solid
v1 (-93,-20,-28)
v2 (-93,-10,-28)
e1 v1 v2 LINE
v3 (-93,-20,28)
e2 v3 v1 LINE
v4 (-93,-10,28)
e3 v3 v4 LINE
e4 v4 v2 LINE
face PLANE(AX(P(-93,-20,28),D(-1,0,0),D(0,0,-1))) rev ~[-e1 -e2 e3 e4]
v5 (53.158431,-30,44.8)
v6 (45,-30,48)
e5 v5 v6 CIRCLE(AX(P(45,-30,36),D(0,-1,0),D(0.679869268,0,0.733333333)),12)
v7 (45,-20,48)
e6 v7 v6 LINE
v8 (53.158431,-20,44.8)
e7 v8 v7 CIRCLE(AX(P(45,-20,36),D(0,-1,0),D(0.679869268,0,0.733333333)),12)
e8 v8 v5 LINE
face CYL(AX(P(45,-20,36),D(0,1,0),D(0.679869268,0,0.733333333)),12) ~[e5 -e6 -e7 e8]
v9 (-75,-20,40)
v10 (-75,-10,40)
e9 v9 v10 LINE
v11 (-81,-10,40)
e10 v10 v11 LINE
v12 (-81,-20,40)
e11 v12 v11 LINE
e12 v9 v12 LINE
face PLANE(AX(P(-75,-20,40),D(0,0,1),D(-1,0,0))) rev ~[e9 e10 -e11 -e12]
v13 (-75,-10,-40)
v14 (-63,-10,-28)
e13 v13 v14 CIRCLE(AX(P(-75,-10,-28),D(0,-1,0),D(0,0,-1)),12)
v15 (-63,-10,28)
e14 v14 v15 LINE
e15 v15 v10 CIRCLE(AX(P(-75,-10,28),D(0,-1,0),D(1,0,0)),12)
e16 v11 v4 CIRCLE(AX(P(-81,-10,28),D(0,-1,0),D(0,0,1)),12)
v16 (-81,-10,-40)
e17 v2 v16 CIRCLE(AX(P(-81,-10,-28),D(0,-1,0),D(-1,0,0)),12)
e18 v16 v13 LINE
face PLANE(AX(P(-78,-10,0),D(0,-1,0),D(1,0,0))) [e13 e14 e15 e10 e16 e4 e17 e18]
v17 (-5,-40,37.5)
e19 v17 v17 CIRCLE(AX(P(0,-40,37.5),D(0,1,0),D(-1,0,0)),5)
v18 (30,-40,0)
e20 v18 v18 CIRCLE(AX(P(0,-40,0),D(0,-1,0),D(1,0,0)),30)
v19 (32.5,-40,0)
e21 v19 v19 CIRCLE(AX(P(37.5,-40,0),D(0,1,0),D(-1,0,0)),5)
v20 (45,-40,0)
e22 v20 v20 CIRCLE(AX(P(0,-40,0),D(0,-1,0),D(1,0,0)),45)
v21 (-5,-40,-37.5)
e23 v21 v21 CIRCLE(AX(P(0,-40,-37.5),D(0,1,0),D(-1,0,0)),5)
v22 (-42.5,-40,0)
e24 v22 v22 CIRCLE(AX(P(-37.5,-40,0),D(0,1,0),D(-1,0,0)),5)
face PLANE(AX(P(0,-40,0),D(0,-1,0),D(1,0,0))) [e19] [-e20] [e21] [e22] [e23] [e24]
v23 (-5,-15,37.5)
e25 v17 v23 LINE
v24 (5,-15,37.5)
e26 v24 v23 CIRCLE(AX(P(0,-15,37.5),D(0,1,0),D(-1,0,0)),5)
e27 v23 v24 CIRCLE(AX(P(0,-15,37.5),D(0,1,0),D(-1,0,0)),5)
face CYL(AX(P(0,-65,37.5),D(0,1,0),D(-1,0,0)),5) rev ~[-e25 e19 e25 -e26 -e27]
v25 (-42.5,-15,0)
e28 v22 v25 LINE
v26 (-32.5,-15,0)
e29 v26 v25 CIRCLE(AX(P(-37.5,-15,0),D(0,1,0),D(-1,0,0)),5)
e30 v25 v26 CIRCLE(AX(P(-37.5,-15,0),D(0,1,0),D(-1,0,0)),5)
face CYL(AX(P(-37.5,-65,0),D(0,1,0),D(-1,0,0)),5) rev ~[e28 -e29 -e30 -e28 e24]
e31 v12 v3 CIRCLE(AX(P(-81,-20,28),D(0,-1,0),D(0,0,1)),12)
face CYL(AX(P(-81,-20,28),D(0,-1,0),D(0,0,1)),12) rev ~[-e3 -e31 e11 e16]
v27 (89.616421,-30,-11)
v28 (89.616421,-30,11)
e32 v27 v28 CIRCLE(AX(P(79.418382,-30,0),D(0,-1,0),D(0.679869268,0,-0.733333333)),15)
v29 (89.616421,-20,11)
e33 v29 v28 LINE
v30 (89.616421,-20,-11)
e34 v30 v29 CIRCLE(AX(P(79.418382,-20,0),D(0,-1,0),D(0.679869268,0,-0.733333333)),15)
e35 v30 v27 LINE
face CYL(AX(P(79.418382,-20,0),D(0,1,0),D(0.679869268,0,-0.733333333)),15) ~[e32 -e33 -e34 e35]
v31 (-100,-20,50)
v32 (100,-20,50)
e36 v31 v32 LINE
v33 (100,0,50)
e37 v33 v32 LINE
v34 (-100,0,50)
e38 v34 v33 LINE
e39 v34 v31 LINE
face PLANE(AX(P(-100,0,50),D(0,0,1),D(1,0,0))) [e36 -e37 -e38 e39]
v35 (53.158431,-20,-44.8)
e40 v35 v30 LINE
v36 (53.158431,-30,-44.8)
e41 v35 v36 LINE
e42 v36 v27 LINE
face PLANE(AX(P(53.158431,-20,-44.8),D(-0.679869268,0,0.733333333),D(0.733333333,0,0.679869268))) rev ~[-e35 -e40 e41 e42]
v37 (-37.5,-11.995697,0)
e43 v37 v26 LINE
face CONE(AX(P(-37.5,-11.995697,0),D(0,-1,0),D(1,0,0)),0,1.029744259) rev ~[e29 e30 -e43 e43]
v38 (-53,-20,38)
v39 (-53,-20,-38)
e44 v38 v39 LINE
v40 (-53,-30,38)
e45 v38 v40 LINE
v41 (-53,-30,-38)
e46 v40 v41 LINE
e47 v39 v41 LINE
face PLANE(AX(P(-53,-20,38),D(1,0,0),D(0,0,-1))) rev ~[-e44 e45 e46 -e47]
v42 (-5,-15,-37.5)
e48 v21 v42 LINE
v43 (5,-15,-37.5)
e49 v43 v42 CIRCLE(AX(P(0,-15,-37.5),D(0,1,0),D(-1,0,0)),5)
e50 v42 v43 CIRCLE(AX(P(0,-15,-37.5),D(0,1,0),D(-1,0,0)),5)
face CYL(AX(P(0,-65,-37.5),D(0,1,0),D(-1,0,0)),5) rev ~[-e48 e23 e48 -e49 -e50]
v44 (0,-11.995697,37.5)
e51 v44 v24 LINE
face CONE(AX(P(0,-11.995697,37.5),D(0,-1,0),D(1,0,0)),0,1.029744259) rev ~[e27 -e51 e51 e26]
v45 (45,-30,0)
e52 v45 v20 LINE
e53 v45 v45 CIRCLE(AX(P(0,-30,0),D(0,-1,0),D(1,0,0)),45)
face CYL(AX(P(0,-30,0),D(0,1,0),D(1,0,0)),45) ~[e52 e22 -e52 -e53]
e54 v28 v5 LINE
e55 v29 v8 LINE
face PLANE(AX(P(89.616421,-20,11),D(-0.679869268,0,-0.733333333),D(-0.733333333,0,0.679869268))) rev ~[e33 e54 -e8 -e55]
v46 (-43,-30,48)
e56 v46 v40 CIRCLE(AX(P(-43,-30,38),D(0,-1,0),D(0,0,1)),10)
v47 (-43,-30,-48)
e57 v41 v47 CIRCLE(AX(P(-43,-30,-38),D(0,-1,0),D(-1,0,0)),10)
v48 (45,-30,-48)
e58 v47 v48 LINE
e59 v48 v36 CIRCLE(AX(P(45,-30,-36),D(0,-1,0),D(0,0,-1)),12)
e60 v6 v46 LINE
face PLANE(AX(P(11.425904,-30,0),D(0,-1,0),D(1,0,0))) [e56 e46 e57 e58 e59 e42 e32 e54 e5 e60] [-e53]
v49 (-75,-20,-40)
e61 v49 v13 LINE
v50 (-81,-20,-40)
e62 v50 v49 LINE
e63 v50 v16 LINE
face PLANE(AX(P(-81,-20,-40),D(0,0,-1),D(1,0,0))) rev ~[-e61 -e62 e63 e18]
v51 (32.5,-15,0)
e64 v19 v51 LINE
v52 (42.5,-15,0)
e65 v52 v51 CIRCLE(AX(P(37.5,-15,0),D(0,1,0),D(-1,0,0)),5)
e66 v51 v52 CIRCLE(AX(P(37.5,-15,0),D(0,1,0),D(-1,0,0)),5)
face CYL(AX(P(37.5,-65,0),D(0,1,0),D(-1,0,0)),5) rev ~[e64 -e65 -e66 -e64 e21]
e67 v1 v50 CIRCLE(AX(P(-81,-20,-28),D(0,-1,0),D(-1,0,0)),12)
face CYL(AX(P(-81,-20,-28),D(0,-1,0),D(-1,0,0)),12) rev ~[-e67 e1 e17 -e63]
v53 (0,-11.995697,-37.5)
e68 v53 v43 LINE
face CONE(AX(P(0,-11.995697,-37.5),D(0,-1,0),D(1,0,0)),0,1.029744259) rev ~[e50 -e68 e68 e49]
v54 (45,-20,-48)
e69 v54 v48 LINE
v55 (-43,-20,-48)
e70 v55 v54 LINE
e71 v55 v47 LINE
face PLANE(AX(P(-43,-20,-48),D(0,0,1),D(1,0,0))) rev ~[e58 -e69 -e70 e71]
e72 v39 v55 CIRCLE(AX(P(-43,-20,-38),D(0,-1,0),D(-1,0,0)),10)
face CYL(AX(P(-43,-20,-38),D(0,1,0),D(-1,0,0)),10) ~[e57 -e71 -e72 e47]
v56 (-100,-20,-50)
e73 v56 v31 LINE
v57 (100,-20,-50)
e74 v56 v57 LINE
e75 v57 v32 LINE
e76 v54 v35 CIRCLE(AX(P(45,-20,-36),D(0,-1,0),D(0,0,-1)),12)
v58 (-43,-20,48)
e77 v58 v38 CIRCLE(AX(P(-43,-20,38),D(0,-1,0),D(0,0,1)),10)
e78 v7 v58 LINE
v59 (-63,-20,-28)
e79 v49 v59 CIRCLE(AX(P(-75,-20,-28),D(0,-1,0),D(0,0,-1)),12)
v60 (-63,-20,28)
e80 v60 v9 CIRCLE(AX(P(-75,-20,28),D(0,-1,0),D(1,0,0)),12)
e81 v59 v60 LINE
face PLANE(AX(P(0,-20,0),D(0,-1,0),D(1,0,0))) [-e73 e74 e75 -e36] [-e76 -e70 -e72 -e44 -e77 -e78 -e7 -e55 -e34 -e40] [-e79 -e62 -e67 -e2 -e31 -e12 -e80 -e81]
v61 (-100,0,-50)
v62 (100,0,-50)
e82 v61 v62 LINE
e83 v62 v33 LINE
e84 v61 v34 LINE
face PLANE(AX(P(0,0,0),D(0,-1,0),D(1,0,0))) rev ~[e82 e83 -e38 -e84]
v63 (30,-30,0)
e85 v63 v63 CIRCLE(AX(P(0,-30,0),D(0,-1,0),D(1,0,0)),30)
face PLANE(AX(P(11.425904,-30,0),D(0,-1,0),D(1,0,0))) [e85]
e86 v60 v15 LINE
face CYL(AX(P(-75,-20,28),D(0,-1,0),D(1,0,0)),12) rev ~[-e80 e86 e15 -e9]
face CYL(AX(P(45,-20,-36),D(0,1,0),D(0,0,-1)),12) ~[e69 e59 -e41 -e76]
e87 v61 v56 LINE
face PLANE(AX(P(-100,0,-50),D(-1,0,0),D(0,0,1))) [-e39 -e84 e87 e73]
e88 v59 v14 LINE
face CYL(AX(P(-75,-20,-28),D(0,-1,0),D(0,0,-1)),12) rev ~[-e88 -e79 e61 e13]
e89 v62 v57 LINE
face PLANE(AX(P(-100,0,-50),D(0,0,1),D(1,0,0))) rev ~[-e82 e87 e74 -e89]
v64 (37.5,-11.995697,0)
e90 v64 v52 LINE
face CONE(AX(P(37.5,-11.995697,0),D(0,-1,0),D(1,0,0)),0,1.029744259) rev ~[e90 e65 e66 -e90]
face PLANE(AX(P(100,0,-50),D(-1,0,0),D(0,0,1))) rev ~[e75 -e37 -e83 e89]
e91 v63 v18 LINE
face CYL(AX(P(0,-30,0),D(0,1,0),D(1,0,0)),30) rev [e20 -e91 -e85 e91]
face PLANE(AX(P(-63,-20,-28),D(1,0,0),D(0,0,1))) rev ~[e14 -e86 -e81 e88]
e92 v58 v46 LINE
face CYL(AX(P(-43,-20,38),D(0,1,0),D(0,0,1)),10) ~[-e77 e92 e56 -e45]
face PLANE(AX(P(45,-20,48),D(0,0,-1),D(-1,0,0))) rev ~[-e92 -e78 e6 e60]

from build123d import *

# Parameters (mm, degrees)
F0_W     = 200
F0_H     = 100
F1_DEPTH = 20
F3_DEPTH = 10
F5_DEPTH = 10
F6_R     = 45
F6_R_2   = 30
F7_DEPTH = 10
F9_D     = 10
F9_DEPTH = 25
F9_TIP   = 3.0043030951


with BuildPart() as f1:
    # F0 (on Front) → F1 (new body)
    with BuildSketch(Plane.XZ):
        Rectangle(F0_W, F0_H)
    extrude(amount=F1_DEPTH)

    # F2 (on face) → F3 (cut)
    with BuildSketch(Plane.XZ.offset(20)):
        with BuildLine():
            Line((-81, -40), (-75, -40))
            ThreePointArc((-75, -40), (-66.5147186258, -36.4852813742), (-63, -28))
            Line((-63, -28), (-63, 28))
            ThreePointArc((-63, 28), (-66.5147186258, 36.4852813742), (-75, 40))
            Line((-75, 40), (-81, 40))
            ThreePointArc((-81, 40), (-89.4852813742, 36.4852813742), (-93, 28))
            Line((-93, 28), (-93, -28))
            ThreePointArc((-93, -28), (-89.4852813742, -36.4852813742), (-81, -40))
        make_face()
    extrude(amount=-F3_DEPTH, mode=Mode.SUBTRACT)

    # F4 (on face) → F5 (join)
    with BuildSketch(Plane.XZ.offset(20)):
        with BuildLine():
            ThreePointArc((-43, 48), (-50.0710678119, 45.0710678119), (-53, 38))
            Line((-53, 38), (-53, -38))
            ThreePointArc((-53, -38), (-50.0710678119, -45.0710678119), (-43, -48))
            Line((-43, -48), (45, -48))
            ThreePointArc((45, -48), (49.38178046, -47.171392035), (53.1584312217, -44.8))
            Line((53.1584312217, -44.8), (89.6164207439, -11))
            ThreePointArc((89.6164207439, -11), (94.4183817168, 0), (89.6164207439, 11))
            Line((89.6164207439, 11), (53.1584312217, 44.8))
            ThreePointArc((53.1584312217, 44.8), (49.38178046, 47.171392035), (45, 48))
            Line((45, 48), (-43, 48))
        make_face()
    extrude(amount=F5_DEPTH)

    # F6 (on face) → F7 (join)
    with BuildSketch(Plane.XZ.offset(30)):
        Circle(F6_R)
        Circle(F6_R_2, mode=Mode.SUBTRACT)
    extrude(amount=F7_DEPTH)

    # F9
    with Locations(Plane.XZ.offset(40)):
        with Locations((-37.5, 0), (0, 37.5), (37.5, 0), (0, -37.5)):
            Hole(F9_D / 2, depth=F9_DEPTH)
            with Locations((0, 0, -(F9_DEPTH + F9_TIP / 2))):  # 118° drill point
                Cone(0, F9_D / 2, F9_TIP, mode=Mode.SUBTRACT)


solid = f1.part
